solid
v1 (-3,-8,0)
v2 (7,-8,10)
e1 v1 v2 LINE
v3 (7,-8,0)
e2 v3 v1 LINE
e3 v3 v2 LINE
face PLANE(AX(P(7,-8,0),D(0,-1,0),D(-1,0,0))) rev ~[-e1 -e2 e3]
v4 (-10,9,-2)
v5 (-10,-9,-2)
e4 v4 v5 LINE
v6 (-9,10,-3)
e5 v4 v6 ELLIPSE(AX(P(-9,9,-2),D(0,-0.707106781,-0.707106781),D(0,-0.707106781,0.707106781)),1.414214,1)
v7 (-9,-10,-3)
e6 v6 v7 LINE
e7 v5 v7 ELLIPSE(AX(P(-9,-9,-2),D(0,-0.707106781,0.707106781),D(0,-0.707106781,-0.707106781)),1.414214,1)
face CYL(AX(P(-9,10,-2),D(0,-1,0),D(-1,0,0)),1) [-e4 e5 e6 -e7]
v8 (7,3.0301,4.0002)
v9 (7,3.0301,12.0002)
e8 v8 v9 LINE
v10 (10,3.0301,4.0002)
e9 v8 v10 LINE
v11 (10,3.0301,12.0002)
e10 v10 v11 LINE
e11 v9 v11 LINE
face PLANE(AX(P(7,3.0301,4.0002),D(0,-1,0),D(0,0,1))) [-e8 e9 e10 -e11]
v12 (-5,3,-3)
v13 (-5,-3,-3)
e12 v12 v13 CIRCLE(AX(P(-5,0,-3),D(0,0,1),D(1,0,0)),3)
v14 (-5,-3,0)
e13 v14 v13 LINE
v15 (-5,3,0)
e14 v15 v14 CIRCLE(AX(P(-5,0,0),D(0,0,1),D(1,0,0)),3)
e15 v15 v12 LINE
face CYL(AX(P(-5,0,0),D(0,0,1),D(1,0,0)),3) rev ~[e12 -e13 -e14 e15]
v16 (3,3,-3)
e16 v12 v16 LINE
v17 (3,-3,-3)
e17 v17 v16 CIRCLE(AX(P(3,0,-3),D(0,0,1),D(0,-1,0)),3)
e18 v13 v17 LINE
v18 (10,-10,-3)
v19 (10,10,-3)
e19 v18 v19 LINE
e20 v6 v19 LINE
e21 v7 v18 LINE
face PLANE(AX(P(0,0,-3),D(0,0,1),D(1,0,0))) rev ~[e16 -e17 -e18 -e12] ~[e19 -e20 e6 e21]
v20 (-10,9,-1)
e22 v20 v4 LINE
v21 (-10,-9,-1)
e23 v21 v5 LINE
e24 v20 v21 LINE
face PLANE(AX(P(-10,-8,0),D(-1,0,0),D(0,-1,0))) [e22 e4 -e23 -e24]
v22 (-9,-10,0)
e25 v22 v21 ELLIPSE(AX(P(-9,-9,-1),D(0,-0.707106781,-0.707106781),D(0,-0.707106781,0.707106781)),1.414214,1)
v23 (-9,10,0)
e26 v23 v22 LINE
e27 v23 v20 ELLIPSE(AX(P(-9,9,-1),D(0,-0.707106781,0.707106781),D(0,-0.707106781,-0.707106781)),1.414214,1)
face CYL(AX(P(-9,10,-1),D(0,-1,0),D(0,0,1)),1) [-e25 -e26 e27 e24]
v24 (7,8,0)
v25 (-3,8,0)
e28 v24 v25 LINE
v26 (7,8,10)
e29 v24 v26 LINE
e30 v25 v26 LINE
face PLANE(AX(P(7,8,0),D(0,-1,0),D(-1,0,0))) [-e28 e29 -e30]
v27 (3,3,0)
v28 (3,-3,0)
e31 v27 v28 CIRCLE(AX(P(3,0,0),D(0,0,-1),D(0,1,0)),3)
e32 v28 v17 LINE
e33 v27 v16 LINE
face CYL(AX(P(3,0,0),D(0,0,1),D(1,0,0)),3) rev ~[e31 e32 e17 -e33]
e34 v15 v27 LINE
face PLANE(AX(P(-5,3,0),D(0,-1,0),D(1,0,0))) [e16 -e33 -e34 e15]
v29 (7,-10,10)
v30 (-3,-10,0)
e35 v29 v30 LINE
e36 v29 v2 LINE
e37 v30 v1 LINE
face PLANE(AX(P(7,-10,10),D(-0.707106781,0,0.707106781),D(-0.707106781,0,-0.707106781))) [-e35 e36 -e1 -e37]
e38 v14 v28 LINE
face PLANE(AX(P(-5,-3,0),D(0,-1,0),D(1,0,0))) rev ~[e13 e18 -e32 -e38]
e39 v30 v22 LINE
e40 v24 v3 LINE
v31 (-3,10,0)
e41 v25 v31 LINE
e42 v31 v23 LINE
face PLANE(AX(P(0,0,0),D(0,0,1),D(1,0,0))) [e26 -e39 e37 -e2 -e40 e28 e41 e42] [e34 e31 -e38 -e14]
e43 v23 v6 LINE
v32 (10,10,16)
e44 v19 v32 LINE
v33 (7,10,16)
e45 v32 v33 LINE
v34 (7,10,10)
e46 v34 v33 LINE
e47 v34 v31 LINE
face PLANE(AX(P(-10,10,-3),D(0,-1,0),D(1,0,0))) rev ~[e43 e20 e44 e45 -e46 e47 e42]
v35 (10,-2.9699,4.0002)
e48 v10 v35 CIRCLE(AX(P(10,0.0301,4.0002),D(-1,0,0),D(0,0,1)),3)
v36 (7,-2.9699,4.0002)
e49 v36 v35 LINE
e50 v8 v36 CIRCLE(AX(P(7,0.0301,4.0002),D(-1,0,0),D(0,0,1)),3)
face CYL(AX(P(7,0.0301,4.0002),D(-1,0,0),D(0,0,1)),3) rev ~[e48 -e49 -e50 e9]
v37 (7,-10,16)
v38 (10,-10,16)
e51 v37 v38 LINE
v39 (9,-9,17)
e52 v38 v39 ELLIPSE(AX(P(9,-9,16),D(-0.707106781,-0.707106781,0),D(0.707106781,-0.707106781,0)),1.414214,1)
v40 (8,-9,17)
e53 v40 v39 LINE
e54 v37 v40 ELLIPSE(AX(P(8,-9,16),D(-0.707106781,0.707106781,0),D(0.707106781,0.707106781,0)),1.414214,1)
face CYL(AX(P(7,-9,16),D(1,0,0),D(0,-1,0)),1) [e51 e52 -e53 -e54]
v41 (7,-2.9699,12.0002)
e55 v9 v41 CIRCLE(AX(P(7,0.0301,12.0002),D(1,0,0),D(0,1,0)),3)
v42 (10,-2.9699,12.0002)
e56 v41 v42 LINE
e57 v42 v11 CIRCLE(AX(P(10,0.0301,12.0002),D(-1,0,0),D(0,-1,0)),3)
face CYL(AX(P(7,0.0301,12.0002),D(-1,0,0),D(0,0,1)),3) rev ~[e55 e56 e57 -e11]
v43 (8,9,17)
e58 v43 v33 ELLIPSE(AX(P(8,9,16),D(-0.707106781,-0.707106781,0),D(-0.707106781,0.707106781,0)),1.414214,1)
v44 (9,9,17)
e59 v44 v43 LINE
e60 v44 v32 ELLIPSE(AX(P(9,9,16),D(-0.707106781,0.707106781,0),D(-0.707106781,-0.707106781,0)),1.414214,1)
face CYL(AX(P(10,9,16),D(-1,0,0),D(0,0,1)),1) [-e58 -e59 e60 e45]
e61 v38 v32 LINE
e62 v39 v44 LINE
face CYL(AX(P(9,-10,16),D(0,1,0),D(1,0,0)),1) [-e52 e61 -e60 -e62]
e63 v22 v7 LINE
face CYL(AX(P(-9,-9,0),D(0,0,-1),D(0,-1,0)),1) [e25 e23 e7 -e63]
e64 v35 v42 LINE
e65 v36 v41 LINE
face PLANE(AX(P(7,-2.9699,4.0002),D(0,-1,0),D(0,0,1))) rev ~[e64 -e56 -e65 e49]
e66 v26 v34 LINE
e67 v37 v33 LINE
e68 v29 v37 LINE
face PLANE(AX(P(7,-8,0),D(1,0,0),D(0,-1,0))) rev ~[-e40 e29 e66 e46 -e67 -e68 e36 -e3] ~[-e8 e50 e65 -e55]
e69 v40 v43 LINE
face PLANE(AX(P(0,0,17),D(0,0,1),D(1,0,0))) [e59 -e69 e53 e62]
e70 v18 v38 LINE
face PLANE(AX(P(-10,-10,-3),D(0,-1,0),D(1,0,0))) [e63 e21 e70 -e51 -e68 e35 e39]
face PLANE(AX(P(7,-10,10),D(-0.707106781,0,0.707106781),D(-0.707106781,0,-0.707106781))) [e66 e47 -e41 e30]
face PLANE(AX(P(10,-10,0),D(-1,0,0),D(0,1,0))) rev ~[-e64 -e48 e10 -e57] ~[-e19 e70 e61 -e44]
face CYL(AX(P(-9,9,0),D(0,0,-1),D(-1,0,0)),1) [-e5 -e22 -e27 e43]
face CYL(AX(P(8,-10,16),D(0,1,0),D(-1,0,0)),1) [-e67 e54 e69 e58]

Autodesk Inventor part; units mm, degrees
ref_plane "YZ Plane" through (0, 0, 0) normal (1, 0, 0) x (0, 1, 0)
ref_plane "XZ Plane" through (0, 0, 0) normal (0, 1, 0) x (-1, 0, 0)
ref_plane "XY Plane" through (0, 0, 0) normal (0, 0, 1) x (1, 0, 0)
sketch "Sketch1" plane through (0, 0, 0) normal (0, 0, 1) x (1, 0, 0)
  line L0 (-10, -10) -> (10, -10)
  line L1 (10, -10) -> (10, 10)
  line L2 (10, 10) -> (-10, 10)
  line L3 (-10, 10) -> (-10, -10)
  line L4 (-10, -10) -> (10, 10) construction
  line L5 (10, -10) -> (-10, 10) construction
  line L6 (7, 10) -> (7, -10)
  circle A0 centre (3, 0) radius 3
  circle A1 centre (-5, 0) radius 3
  line L7 (-5, 3) -> (3, 3)
  line L8 (-5, -3) -> (3, -3)
  line L9 (10, -10) -> (10, 17.1252) construction
  line L10 (7, 8) -> (-10, 8)
  line L11 (7, -8) -> (-10, -8)
  point P0 (0, 0)
  dimension "d0" = 20
  dimension "d1" = 20
  dimension "d2" = 3
  dimension "d3" = 6
  dimension "d4" = 4
  dimension "d5" = 6
  dimension "d6" = 5
  dimension "d16" = 2
  dimension "d17" = 2
extrude "Extrusion1" add sketch "Sketch1" against normal blind 3 contours L3 L11 L6 L0 | L6 L2 L1 L0 | L3 L10 L6 L11 | L3 L2 L6 L10 | A0 | A0 L8 A1 L7 | A1
extrude "Extrusion2" add sketch "Sketch1" along normal blind 17 contours L6 L2 L1 L0
sketch "Sketch2" plane through (-10, -10, -3) normal (0, -1, 0) x (1, 0, 0)
  line L0 (0, 3) -> (17, 3) projected
  line L1 (17, 3) -> (7, 3)
  line L2 (17, 3) -> (17, 20) projected
  line L3 (17, 13) -> (17, 3)
  line L4 (17, 13) -> (7, 3)
  point P0 (10, 3)
  dimension "d11" = 10
  dimension "d13" = 10
extrude "Extrusion3" add sketch "Sketch2" against normal blind 20
extrude "Extrusion4" cut sketch "Sketch1" along normal blind 20 contours L3 L10 L6 L11 | A0 | A0 L8 A1 L7 | A1
sketch "Sketch3" plane through (7, -10, 17) normal (-1, 0, 0) x (0, 0, 1)
  circle A0 centre (-4.9998, 10.0301) radius 3
  circle A1 centre (-12.9998, 10.0301) radius 3
  line L0 (-12.9998, 13.0301) -> (-4.9998, 13.0301)
  line L1 (-12.9998, 7.0301) -> (-4.9998, 7.0301)
  line L2 (0, 20) -> (0, 0) projected
  line L3 (0, 10) -> (-2, 10) construction
  point P0 (-17, 10)
  dimension "d20" = 6
  dimension "d21" = 6
  dimension "d22" = 2
extrude "Extrusion5" cut sketch "Sketch1" against normal blind 3 contours A0 | A0 L8 A1 L7 | A1
extrude "Extrusion6" cut sketch "Sketch3" against normal blind 3
fillet "Fillet1" radius 1 8 edges at (8.5, -10, 17) (8.5, 10, 17) (7, 0, 17) (10, 0, 17) (-10, 0, 0) (-10, 0, -3) (-10, 10, -1.5) (-10, -10, -1.5)
properties part number "grid_board_8020_corner_mount"
